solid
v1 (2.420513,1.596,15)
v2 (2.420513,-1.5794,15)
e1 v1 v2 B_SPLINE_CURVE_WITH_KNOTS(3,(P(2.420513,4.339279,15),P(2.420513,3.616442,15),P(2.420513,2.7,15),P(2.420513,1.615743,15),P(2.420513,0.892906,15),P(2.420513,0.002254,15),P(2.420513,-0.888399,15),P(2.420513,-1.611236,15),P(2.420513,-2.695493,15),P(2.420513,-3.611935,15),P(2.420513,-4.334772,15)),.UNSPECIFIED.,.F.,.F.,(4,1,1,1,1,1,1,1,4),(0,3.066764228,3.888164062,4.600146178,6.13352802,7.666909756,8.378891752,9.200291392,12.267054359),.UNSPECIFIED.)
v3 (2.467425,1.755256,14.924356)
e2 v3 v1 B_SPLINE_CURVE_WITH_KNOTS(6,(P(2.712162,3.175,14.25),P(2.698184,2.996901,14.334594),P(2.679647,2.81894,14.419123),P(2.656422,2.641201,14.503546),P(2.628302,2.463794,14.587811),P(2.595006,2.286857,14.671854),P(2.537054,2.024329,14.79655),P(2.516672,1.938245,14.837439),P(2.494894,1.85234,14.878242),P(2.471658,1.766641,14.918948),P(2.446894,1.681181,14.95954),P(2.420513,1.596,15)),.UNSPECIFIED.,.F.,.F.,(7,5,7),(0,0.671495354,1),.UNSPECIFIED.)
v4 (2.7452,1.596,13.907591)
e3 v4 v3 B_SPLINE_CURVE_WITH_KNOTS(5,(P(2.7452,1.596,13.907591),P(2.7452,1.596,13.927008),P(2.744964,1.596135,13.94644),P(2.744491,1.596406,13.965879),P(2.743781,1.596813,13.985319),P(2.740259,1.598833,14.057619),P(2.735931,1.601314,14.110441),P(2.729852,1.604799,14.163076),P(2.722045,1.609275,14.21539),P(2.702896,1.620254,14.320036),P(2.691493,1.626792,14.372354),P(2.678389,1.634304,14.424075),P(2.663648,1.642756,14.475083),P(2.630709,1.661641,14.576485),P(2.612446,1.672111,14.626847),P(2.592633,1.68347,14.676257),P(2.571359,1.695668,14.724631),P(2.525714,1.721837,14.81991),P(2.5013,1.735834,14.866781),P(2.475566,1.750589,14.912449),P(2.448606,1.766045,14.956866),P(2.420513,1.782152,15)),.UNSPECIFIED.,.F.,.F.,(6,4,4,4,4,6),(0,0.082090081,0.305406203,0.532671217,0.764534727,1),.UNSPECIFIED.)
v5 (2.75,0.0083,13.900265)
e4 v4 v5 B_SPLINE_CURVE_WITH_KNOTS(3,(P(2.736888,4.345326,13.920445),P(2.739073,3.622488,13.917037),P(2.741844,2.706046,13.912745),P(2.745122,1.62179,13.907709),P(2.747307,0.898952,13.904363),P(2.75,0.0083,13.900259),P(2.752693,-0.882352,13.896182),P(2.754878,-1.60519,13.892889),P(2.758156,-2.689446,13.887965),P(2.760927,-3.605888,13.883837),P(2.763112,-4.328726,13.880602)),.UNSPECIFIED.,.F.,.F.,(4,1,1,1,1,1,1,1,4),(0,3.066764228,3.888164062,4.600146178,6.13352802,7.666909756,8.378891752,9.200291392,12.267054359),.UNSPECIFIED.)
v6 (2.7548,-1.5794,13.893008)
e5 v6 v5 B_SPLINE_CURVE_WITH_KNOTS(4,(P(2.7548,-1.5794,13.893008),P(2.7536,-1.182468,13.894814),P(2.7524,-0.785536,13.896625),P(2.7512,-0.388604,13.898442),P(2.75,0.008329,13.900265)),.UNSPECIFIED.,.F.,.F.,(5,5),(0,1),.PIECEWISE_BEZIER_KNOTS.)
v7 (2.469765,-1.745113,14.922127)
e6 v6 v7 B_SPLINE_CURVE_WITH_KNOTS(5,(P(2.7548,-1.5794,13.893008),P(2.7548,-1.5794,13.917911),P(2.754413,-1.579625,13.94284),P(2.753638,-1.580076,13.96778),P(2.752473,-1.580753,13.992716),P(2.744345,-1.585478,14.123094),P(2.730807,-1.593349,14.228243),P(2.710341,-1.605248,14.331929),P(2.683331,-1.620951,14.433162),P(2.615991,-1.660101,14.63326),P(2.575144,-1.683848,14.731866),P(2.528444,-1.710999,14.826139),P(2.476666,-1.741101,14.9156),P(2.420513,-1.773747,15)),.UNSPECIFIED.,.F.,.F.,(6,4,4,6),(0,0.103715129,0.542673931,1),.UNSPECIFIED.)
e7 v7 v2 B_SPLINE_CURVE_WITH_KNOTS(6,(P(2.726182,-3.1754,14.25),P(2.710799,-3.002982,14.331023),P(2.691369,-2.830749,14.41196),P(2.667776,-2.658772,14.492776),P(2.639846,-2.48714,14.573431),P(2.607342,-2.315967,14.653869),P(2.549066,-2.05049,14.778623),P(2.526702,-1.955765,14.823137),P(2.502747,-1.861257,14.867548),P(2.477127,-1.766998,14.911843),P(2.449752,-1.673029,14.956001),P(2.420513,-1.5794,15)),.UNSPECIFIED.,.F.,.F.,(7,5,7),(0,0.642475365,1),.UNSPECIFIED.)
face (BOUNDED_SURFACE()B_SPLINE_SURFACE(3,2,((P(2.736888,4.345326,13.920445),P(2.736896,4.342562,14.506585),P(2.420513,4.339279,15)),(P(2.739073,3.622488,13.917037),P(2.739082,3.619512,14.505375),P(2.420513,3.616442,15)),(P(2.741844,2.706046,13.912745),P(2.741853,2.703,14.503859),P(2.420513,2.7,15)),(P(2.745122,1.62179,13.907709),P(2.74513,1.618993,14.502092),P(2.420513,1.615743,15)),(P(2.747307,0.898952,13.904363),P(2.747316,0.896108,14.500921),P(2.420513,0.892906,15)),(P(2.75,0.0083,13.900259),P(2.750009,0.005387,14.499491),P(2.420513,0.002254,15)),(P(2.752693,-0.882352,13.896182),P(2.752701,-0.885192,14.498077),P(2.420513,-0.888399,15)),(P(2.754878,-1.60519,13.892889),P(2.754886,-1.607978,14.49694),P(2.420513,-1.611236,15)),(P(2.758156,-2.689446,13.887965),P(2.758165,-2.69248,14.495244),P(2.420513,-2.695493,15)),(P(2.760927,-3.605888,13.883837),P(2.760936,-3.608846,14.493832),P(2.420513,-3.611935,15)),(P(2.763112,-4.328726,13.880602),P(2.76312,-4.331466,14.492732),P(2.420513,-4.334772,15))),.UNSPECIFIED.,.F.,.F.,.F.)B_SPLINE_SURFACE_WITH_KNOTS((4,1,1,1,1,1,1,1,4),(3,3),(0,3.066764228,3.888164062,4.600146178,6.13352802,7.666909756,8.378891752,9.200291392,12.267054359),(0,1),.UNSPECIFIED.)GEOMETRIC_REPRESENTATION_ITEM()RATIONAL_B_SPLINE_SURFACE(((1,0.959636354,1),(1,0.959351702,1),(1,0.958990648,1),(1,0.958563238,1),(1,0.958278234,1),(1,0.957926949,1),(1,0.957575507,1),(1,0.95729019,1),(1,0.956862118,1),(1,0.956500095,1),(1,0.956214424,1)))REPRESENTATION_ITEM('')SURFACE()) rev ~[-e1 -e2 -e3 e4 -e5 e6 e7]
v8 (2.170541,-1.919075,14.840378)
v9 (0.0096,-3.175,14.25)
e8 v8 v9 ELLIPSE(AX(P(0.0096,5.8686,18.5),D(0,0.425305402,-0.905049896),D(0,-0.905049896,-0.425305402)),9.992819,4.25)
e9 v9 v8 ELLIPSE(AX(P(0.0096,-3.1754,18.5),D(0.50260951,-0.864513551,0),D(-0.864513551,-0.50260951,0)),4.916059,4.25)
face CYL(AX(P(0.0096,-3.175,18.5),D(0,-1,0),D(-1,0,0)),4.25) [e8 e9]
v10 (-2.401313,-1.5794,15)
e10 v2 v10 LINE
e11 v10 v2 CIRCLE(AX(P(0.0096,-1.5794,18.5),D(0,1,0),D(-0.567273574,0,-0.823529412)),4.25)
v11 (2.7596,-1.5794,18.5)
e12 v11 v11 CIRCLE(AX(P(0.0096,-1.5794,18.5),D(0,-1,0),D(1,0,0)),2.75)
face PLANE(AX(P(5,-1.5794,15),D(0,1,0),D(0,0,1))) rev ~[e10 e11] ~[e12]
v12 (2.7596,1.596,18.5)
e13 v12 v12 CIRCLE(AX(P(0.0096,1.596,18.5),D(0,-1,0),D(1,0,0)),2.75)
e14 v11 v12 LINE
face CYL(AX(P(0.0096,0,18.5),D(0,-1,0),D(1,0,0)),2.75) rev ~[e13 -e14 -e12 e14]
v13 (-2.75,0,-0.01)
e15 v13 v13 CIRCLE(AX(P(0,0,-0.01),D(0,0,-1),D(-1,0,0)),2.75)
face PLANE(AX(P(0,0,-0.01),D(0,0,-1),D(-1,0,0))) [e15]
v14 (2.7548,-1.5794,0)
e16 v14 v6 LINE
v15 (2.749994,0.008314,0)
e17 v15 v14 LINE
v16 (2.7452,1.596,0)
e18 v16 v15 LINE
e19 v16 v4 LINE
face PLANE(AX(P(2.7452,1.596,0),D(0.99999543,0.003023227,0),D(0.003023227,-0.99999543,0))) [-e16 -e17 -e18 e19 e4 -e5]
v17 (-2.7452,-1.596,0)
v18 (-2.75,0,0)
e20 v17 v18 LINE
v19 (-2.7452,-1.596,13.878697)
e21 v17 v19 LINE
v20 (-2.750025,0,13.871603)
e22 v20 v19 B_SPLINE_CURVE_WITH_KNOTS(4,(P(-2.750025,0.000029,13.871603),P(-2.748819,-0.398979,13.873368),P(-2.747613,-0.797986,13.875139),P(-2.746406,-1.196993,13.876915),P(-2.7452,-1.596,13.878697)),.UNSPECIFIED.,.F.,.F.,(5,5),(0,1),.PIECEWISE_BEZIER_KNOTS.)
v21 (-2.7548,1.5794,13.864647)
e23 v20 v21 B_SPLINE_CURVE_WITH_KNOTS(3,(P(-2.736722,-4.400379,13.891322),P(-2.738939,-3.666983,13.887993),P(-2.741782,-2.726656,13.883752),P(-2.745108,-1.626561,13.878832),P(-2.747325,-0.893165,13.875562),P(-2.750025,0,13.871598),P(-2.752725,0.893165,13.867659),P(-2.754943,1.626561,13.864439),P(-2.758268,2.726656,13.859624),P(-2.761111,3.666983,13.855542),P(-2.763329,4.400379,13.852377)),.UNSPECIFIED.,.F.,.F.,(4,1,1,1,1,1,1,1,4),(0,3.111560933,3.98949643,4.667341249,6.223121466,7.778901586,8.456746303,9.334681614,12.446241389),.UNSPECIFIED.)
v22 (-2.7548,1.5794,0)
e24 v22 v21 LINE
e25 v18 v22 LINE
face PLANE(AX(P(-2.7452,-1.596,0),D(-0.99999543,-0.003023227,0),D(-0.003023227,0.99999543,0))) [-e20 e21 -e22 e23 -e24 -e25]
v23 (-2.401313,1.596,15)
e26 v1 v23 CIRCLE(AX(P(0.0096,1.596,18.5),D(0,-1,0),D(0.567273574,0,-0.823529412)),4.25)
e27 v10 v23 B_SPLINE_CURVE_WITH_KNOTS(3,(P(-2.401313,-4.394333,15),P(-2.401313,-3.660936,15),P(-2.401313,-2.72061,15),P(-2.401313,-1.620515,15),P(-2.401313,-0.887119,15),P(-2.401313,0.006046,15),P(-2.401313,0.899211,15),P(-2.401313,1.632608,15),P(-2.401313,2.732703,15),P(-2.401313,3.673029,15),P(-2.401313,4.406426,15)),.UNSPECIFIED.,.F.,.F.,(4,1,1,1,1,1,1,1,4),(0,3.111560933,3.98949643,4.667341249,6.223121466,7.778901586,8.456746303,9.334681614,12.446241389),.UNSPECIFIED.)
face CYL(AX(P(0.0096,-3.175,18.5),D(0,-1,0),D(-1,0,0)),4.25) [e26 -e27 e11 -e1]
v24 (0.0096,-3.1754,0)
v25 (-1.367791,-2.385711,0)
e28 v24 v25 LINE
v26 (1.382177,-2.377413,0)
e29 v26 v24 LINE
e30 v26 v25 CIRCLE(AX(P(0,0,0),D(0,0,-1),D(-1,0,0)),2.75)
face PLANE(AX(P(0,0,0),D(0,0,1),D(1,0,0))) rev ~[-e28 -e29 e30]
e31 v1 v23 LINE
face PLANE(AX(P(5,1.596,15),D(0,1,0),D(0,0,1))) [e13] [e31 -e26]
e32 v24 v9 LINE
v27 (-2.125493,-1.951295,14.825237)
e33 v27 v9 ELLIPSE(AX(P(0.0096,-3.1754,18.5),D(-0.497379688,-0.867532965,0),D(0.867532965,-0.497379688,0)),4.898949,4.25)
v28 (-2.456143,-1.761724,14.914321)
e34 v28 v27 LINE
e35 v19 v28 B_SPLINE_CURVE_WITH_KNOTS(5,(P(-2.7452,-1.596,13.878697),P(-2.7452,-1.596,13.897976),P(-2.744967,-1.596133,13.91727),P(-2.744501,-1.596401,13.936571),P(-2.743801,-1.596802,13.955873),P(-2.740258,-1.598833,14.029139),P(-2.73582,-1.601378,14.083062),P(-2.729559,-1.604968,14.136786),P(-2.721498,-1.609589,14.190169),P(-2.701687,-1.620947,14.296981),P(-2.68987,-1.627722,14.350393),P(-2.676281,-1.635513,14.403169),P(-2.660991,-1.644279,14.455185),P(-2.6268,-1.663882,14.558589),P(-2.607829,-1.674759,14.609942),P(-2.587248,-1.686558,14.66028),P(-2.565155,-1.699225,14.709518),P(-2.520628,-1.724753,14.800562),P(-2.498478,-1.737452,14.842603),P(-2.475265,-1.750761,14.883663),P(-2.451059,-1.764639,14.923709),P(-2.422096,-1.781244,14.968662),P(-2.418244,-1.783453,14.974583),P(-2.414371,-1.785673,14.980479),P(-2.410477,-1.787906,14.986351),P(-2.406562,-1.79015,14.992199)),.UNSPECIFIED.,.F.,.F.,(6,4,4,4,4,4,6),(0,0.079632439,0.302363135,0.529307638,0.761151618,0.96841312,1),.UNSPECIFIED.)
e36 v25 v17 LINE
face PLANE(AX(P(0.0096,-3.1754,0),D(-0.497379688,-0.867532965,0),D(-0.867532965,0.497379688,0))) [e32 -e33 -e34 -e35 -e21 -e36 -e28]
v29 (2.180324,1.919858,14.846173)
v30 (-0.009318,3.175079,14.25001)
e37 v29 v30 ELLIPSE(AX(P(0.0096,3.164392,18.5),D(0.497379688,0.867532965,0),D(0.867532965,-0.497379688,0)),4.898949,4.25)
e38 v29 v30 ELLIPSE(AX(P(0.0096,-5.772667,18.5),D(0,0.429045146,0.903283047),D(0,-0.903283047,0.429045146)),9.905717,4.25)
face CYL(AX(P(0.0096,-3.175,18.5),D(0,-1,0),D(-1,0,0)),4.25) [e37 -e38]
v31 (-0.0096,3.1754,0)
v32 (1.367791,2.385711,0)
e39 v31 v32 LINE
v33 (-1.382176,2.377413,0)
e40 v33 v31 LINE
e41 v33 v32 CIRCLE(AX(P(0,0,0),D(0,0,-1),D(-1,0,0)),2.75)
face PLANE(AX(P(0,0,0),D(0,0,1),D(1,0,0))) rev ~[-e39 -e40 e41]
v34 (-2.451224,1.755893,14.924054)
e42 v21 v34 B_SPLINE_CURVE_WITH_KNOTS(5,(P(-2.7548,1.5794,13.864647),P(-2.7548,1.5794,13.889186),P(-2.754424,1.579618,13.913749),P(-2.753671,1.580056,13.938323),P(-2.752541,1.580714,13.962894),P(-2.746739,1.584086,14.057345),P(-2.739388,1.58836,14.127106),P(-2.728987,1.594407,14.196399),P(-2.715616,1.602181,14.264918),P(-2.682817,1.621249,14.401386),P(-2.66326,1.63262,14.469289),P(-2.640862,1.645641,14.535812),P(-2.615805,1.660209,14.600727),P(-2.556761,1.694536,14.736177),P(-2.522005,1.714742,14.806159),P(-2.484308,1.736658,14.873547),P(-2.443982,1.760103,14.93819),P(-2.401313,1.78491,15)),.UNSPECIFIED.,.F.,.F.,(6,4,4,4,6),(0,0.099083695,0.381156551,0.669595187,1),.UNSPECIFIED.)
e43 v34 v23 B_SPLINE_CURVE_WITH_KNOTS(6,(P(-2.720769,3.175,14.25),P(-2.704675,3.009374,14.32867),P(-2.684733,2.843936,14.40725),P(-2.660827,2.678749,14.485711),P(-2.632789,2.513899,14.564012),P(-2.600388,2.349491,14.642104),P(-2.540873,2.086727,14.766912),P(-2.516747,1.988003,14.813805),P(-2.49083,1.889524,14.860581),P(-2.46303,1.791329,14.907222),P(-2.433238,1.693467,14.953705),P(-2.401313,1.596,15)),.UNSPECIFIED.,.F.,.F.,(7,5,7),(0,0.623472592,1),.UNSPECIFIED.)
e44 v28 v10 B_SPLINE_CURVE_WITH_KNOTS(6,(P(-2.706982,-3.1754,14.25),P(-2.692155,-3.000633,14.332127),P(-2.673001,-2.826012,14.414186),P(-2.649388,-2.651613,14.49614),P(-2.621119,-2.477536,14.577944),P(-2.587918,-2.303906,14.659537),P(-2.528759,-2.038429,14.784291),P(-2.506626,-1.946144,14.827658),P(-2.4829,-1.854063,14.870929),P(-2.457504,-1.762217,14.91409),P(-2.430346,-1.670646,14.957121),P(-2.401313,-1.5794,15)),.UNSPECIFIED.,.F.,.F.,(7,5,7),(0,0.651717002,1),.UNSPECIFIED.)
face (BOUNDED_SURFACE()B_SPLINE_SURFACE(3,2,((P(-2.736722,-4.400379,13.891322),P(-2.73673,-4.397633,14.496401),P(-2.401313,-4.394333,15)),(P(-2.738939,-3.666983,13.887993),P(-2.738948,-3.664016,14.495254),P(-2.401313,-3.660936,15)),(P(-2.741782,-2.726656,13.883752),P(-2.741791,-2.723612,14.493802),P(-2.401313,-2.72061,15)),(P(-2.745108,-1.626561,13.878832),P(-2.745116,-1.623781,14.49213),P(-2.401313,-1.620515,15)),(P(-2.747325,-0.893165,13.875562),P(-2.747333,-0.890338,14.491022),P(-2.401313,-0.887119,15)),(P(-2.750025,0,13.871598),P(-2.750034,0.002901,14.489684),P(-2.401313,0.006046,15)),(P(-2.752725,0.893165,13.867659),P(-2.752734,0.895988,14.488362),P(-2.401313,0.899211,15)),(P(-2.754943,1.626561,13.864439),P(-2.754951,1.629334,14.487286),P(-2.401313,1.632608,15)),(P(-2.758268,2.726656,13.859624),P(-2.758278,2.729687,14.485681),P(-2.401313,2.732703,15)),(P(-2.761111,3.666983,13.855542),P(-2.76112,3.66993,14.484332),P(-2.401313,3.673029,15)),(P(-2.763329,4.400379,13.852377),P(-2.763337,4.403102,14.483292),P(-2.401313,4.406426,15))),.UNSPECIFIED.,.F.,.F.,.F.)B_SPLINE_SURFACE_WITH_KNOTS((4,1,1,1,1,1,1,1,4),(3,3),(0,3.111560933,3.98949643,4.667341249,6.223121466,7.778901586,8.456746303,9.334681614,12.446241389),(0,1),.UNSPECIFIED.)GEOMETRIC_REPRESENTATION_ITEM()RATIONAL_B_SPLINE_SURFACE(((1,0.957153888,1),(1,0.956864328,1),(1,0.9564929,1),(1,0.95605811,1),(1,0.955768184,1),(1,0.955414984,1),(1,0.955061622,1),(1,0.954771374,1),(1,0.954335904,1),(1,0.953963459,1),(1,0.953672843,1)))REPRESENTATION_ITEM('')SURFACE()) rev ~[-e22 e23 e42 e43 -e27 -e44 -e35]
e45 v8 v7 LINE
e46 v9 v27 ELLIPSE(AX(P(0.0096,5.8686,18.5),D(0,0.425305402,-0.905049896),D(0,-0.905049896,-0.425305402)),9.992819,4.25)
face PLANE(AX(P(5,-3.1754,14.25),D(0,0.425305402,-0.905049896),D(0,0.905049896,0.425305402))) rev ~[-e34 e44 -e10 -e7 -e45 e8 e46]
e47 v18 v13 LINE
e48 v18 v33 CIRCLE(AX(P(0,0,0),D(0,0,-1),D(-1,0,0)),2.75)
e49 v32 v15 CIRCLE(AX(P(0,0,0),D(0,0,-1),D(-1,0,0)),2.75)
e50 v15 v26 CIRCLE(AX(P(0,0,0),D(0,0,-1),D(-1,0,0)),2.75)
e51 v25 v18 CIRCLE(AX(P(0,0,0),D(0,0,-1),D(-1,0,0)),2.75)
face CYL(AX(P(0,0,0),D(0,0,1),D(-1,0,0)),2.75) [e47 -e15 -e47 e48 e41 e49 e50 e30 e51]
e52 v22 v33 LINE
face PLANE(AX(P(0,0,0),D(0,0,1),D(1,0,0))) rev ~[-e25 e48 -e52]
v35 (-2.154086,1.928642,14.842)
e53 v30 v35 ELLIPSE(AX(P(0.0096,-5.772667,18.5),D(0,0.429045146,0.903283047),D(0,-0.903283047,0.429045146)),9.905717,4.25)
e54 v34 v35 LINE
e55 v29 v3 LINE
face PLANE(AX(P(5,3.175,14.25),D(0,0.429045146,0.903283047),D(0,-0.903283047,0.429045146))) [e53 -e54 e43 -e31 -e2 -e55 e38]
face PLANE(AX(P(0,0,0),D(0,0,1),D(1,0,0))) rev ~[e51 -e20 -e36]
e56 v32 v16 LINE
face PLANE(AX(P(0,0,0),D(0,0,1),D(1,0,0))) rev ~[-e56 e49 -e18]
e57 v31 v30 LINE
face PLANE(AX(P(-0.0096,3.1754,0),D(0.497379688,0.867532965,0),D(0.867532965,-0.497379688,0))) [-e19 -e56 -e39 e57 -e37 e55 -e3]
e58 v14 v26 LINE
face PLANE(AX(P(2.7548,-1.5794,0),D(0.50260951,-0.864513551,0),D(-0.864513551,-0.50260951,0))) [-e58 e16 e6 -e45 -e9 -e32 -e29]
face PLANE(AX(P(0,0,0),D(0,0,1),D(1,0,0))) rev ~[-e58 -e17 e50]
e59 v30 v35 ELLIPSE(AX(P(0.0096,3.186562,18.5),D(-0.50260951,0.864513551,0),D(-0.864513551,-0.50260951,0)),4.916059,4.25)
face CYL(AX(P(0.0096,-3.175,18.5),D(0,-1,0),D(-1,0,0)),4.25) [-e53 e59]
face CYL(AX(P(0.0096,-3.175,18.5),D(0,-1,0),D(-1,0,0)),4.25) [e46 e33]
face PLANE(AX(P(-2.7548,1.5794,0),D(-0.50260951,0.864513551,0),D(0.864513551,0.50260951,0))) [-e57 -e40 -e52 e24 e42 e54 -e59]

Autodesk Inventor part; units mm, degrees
sketch "Boceto1" plane through (0, 0, 0) normal (0, 0, 1) x (1, 0, 0)
  line L0 (2.7452, 1.596) -> (2.7548, -1.5794)
  line L1 (2.7548, -1.5794) -> (0.0096, -3.1754)
  line L2 (0.0096, -3.1754) -> (-2.7452, -1.596)
  line L3 (-2.7452, -1.596) -> (-2.7548, 1.5794)
  line L4 (-2.7548, 1.5794) -> (-0.0096, 3.1754)
  line L5 (-0.0096, 3.1754) -> (2.7452, 1.596)
  point P0 (0, 0)
  point P1 (0, 0)
  dimension "d0" = 5.5
  dimension "d20" = 6.3508
extrude "Extrusión1" add sketch "Boceto1" along normal blind 15
ref_plane "Plano de trabajo4" through (-2.7452, -1.596, 0) normal (0, 0, -1) x (-1, 0, 0)
sketch "Boceto2" plane through (-2.7452, -1.596, 0) normal (0, 0, -1) x (-1, 0, 0)
  line L0 (-2.7548, -1.5794) -> (1.0358, -1.5794)
  line L1 (1.0358, -1.5794) -> (-2.7548, -1.5794)
  line L2 (-5.6299, -1.5794) -> (-2.7548, -1.5794)
  point P0 (-2.7452, 1.596)
  dimension "d5" = 3.1754
ref_plane "Plano de trabajo5" through (0, -3.175, 0) normal (0, 1, 0) x (-1, 0, 0)
sketch "Boceto3" plane through (0, -3.175, 0) normal (0, 1, 0) x (-1, 0, 0)
  line L0 (-0.0096, 15) -> (-2.7548, 15) projected
  line L1 (2.6199, 14) -> (-2.7548, 14) construction
  line L2 (-0.0096, 0) -> (-0.0096, 15) projected
  line L3 (-0.0096, 14) -> (-0.0096, 18.5)
  circle A0 centre (-0.0096, 18.5) radius 4.25
  circle A1 centre (-0.0096, 18.5) radius 2.75
  point P0 (0, 0)
  dimension "d7" = 1
  dimension "d8" = 4.5
  dimension "d9" = 8.5
  dimension "d14" = 5.5
sketch "Boceto4" plane through (-2.7452, -1.596, 0) normal (0, 0, -1) x (-1, 0, 0)
  point P0 (-2.7452, 1.596)
  point P1 (-2.7356, 4.7714)
  point P2 (-2.7548, -1.579)
  dimension "d10" = 6.3504
extrude "Extrusión2" add sketch "Boceto3" along normal blind 6.35 contours L2 A0 L0 | L0 A0 L2 | A1
ref_plane "Barreno" through (0, 0, 0) normal (0, -1, 0) x (1, 0, 0)
sketch "Boceto6" plane through (0, 0, 0) normal (0, -1, 0) x (1, 0, 0)
  arc A0 (0.0103, 14.25) -> (0.0089, 14.25) centre (0.0096, 18.5) ccw projected
  circle A1 centre (0.0096, 18.5) radius 2.75 projected
  point P0 (0, 0)
  dimension "d13" = 4.25
extrude "Extrusión3" cut sketch "Boceto6" along normal mid plane 10 contours A1
ref_plane "Plano de trabajo8" through (5, 0, 0) normal (1, 0, 0) x (0, 1, 0)
sketch "Boceto8" plane through (5, 0, 0) normal (1, 0, 0) x (0, 1, 0)
  line L0 (-3.175, 15.75) -> (-3.175, 21.25) projected
  line L1 (-3.1754, 14.25) -> (-1.5794, 15)
  line L2 (-1.5794, 15) -> (-1.5794, 22.75)
  line L3 (-1.5794, 22.75) -> (-3.175, 22.75)
  line L4 (3.175, 14.25) -> (1.596, 15)
  line L5 (1.596, 15) -> (1.596, 22.75)
  line L6 (1.596, 22.75) -> (3.175, 22.75)
  ellipse E0 centre (3.1866, 18.5) end of major axis (3.1866, 14.25) minor radius 2.4709 (1.7849, 15) -> (3.175, 14.25) ccw projected
  line L7 (-3.175, 22.75) -> (-6.1952, 22.75)
  line L8 (-6.1952, 22.75) -> (-6.1952, 14.0055)
  line L9 (-6.1952, 14.0055) -> (-3.1754, 14.25)
  line L10 (3.175, 14.25) -> (7.2865, 13.4418)
  line L11 (7.2865, 13.4418) -> (6.5328, 22.75)
  line L12 (6.5328, 22.75) -> (3.175, 22.75)
  point P0 (0, 0)
  point P1 (-1.5794, 15)
extrude "Extrusión4" cut sketch "Boceto8" against normal blind 10 contours L9 L8 L7 L3 L2 L1 | L4 L5 L6 L12 L11 L10
fillet "Empalme1" radius 2 1 edges at (-2.75, 0, 15)
fillet "Empalme2" radius 2 1 edges at (2.75, 0.0083, 15)
ref_plane "Plano de trabajo9" through (0, 0, 0) normal (0, 0, -1) x (-1, 0, 0)
sketch "Boceto9" plane through (0, 0, 0) normal (0, 0, -1) x (-1, 0, 0)
  circle A0 centre (0, 0) radius 2.75
  line L0 (2.7548, 1.5794) -> (2.7452, -1.596) projected
extrude "Extrusión5" add sketch "Boceto9" along normal blind 0.01
properties part number "Cabezal" material "Plástico ABS"
